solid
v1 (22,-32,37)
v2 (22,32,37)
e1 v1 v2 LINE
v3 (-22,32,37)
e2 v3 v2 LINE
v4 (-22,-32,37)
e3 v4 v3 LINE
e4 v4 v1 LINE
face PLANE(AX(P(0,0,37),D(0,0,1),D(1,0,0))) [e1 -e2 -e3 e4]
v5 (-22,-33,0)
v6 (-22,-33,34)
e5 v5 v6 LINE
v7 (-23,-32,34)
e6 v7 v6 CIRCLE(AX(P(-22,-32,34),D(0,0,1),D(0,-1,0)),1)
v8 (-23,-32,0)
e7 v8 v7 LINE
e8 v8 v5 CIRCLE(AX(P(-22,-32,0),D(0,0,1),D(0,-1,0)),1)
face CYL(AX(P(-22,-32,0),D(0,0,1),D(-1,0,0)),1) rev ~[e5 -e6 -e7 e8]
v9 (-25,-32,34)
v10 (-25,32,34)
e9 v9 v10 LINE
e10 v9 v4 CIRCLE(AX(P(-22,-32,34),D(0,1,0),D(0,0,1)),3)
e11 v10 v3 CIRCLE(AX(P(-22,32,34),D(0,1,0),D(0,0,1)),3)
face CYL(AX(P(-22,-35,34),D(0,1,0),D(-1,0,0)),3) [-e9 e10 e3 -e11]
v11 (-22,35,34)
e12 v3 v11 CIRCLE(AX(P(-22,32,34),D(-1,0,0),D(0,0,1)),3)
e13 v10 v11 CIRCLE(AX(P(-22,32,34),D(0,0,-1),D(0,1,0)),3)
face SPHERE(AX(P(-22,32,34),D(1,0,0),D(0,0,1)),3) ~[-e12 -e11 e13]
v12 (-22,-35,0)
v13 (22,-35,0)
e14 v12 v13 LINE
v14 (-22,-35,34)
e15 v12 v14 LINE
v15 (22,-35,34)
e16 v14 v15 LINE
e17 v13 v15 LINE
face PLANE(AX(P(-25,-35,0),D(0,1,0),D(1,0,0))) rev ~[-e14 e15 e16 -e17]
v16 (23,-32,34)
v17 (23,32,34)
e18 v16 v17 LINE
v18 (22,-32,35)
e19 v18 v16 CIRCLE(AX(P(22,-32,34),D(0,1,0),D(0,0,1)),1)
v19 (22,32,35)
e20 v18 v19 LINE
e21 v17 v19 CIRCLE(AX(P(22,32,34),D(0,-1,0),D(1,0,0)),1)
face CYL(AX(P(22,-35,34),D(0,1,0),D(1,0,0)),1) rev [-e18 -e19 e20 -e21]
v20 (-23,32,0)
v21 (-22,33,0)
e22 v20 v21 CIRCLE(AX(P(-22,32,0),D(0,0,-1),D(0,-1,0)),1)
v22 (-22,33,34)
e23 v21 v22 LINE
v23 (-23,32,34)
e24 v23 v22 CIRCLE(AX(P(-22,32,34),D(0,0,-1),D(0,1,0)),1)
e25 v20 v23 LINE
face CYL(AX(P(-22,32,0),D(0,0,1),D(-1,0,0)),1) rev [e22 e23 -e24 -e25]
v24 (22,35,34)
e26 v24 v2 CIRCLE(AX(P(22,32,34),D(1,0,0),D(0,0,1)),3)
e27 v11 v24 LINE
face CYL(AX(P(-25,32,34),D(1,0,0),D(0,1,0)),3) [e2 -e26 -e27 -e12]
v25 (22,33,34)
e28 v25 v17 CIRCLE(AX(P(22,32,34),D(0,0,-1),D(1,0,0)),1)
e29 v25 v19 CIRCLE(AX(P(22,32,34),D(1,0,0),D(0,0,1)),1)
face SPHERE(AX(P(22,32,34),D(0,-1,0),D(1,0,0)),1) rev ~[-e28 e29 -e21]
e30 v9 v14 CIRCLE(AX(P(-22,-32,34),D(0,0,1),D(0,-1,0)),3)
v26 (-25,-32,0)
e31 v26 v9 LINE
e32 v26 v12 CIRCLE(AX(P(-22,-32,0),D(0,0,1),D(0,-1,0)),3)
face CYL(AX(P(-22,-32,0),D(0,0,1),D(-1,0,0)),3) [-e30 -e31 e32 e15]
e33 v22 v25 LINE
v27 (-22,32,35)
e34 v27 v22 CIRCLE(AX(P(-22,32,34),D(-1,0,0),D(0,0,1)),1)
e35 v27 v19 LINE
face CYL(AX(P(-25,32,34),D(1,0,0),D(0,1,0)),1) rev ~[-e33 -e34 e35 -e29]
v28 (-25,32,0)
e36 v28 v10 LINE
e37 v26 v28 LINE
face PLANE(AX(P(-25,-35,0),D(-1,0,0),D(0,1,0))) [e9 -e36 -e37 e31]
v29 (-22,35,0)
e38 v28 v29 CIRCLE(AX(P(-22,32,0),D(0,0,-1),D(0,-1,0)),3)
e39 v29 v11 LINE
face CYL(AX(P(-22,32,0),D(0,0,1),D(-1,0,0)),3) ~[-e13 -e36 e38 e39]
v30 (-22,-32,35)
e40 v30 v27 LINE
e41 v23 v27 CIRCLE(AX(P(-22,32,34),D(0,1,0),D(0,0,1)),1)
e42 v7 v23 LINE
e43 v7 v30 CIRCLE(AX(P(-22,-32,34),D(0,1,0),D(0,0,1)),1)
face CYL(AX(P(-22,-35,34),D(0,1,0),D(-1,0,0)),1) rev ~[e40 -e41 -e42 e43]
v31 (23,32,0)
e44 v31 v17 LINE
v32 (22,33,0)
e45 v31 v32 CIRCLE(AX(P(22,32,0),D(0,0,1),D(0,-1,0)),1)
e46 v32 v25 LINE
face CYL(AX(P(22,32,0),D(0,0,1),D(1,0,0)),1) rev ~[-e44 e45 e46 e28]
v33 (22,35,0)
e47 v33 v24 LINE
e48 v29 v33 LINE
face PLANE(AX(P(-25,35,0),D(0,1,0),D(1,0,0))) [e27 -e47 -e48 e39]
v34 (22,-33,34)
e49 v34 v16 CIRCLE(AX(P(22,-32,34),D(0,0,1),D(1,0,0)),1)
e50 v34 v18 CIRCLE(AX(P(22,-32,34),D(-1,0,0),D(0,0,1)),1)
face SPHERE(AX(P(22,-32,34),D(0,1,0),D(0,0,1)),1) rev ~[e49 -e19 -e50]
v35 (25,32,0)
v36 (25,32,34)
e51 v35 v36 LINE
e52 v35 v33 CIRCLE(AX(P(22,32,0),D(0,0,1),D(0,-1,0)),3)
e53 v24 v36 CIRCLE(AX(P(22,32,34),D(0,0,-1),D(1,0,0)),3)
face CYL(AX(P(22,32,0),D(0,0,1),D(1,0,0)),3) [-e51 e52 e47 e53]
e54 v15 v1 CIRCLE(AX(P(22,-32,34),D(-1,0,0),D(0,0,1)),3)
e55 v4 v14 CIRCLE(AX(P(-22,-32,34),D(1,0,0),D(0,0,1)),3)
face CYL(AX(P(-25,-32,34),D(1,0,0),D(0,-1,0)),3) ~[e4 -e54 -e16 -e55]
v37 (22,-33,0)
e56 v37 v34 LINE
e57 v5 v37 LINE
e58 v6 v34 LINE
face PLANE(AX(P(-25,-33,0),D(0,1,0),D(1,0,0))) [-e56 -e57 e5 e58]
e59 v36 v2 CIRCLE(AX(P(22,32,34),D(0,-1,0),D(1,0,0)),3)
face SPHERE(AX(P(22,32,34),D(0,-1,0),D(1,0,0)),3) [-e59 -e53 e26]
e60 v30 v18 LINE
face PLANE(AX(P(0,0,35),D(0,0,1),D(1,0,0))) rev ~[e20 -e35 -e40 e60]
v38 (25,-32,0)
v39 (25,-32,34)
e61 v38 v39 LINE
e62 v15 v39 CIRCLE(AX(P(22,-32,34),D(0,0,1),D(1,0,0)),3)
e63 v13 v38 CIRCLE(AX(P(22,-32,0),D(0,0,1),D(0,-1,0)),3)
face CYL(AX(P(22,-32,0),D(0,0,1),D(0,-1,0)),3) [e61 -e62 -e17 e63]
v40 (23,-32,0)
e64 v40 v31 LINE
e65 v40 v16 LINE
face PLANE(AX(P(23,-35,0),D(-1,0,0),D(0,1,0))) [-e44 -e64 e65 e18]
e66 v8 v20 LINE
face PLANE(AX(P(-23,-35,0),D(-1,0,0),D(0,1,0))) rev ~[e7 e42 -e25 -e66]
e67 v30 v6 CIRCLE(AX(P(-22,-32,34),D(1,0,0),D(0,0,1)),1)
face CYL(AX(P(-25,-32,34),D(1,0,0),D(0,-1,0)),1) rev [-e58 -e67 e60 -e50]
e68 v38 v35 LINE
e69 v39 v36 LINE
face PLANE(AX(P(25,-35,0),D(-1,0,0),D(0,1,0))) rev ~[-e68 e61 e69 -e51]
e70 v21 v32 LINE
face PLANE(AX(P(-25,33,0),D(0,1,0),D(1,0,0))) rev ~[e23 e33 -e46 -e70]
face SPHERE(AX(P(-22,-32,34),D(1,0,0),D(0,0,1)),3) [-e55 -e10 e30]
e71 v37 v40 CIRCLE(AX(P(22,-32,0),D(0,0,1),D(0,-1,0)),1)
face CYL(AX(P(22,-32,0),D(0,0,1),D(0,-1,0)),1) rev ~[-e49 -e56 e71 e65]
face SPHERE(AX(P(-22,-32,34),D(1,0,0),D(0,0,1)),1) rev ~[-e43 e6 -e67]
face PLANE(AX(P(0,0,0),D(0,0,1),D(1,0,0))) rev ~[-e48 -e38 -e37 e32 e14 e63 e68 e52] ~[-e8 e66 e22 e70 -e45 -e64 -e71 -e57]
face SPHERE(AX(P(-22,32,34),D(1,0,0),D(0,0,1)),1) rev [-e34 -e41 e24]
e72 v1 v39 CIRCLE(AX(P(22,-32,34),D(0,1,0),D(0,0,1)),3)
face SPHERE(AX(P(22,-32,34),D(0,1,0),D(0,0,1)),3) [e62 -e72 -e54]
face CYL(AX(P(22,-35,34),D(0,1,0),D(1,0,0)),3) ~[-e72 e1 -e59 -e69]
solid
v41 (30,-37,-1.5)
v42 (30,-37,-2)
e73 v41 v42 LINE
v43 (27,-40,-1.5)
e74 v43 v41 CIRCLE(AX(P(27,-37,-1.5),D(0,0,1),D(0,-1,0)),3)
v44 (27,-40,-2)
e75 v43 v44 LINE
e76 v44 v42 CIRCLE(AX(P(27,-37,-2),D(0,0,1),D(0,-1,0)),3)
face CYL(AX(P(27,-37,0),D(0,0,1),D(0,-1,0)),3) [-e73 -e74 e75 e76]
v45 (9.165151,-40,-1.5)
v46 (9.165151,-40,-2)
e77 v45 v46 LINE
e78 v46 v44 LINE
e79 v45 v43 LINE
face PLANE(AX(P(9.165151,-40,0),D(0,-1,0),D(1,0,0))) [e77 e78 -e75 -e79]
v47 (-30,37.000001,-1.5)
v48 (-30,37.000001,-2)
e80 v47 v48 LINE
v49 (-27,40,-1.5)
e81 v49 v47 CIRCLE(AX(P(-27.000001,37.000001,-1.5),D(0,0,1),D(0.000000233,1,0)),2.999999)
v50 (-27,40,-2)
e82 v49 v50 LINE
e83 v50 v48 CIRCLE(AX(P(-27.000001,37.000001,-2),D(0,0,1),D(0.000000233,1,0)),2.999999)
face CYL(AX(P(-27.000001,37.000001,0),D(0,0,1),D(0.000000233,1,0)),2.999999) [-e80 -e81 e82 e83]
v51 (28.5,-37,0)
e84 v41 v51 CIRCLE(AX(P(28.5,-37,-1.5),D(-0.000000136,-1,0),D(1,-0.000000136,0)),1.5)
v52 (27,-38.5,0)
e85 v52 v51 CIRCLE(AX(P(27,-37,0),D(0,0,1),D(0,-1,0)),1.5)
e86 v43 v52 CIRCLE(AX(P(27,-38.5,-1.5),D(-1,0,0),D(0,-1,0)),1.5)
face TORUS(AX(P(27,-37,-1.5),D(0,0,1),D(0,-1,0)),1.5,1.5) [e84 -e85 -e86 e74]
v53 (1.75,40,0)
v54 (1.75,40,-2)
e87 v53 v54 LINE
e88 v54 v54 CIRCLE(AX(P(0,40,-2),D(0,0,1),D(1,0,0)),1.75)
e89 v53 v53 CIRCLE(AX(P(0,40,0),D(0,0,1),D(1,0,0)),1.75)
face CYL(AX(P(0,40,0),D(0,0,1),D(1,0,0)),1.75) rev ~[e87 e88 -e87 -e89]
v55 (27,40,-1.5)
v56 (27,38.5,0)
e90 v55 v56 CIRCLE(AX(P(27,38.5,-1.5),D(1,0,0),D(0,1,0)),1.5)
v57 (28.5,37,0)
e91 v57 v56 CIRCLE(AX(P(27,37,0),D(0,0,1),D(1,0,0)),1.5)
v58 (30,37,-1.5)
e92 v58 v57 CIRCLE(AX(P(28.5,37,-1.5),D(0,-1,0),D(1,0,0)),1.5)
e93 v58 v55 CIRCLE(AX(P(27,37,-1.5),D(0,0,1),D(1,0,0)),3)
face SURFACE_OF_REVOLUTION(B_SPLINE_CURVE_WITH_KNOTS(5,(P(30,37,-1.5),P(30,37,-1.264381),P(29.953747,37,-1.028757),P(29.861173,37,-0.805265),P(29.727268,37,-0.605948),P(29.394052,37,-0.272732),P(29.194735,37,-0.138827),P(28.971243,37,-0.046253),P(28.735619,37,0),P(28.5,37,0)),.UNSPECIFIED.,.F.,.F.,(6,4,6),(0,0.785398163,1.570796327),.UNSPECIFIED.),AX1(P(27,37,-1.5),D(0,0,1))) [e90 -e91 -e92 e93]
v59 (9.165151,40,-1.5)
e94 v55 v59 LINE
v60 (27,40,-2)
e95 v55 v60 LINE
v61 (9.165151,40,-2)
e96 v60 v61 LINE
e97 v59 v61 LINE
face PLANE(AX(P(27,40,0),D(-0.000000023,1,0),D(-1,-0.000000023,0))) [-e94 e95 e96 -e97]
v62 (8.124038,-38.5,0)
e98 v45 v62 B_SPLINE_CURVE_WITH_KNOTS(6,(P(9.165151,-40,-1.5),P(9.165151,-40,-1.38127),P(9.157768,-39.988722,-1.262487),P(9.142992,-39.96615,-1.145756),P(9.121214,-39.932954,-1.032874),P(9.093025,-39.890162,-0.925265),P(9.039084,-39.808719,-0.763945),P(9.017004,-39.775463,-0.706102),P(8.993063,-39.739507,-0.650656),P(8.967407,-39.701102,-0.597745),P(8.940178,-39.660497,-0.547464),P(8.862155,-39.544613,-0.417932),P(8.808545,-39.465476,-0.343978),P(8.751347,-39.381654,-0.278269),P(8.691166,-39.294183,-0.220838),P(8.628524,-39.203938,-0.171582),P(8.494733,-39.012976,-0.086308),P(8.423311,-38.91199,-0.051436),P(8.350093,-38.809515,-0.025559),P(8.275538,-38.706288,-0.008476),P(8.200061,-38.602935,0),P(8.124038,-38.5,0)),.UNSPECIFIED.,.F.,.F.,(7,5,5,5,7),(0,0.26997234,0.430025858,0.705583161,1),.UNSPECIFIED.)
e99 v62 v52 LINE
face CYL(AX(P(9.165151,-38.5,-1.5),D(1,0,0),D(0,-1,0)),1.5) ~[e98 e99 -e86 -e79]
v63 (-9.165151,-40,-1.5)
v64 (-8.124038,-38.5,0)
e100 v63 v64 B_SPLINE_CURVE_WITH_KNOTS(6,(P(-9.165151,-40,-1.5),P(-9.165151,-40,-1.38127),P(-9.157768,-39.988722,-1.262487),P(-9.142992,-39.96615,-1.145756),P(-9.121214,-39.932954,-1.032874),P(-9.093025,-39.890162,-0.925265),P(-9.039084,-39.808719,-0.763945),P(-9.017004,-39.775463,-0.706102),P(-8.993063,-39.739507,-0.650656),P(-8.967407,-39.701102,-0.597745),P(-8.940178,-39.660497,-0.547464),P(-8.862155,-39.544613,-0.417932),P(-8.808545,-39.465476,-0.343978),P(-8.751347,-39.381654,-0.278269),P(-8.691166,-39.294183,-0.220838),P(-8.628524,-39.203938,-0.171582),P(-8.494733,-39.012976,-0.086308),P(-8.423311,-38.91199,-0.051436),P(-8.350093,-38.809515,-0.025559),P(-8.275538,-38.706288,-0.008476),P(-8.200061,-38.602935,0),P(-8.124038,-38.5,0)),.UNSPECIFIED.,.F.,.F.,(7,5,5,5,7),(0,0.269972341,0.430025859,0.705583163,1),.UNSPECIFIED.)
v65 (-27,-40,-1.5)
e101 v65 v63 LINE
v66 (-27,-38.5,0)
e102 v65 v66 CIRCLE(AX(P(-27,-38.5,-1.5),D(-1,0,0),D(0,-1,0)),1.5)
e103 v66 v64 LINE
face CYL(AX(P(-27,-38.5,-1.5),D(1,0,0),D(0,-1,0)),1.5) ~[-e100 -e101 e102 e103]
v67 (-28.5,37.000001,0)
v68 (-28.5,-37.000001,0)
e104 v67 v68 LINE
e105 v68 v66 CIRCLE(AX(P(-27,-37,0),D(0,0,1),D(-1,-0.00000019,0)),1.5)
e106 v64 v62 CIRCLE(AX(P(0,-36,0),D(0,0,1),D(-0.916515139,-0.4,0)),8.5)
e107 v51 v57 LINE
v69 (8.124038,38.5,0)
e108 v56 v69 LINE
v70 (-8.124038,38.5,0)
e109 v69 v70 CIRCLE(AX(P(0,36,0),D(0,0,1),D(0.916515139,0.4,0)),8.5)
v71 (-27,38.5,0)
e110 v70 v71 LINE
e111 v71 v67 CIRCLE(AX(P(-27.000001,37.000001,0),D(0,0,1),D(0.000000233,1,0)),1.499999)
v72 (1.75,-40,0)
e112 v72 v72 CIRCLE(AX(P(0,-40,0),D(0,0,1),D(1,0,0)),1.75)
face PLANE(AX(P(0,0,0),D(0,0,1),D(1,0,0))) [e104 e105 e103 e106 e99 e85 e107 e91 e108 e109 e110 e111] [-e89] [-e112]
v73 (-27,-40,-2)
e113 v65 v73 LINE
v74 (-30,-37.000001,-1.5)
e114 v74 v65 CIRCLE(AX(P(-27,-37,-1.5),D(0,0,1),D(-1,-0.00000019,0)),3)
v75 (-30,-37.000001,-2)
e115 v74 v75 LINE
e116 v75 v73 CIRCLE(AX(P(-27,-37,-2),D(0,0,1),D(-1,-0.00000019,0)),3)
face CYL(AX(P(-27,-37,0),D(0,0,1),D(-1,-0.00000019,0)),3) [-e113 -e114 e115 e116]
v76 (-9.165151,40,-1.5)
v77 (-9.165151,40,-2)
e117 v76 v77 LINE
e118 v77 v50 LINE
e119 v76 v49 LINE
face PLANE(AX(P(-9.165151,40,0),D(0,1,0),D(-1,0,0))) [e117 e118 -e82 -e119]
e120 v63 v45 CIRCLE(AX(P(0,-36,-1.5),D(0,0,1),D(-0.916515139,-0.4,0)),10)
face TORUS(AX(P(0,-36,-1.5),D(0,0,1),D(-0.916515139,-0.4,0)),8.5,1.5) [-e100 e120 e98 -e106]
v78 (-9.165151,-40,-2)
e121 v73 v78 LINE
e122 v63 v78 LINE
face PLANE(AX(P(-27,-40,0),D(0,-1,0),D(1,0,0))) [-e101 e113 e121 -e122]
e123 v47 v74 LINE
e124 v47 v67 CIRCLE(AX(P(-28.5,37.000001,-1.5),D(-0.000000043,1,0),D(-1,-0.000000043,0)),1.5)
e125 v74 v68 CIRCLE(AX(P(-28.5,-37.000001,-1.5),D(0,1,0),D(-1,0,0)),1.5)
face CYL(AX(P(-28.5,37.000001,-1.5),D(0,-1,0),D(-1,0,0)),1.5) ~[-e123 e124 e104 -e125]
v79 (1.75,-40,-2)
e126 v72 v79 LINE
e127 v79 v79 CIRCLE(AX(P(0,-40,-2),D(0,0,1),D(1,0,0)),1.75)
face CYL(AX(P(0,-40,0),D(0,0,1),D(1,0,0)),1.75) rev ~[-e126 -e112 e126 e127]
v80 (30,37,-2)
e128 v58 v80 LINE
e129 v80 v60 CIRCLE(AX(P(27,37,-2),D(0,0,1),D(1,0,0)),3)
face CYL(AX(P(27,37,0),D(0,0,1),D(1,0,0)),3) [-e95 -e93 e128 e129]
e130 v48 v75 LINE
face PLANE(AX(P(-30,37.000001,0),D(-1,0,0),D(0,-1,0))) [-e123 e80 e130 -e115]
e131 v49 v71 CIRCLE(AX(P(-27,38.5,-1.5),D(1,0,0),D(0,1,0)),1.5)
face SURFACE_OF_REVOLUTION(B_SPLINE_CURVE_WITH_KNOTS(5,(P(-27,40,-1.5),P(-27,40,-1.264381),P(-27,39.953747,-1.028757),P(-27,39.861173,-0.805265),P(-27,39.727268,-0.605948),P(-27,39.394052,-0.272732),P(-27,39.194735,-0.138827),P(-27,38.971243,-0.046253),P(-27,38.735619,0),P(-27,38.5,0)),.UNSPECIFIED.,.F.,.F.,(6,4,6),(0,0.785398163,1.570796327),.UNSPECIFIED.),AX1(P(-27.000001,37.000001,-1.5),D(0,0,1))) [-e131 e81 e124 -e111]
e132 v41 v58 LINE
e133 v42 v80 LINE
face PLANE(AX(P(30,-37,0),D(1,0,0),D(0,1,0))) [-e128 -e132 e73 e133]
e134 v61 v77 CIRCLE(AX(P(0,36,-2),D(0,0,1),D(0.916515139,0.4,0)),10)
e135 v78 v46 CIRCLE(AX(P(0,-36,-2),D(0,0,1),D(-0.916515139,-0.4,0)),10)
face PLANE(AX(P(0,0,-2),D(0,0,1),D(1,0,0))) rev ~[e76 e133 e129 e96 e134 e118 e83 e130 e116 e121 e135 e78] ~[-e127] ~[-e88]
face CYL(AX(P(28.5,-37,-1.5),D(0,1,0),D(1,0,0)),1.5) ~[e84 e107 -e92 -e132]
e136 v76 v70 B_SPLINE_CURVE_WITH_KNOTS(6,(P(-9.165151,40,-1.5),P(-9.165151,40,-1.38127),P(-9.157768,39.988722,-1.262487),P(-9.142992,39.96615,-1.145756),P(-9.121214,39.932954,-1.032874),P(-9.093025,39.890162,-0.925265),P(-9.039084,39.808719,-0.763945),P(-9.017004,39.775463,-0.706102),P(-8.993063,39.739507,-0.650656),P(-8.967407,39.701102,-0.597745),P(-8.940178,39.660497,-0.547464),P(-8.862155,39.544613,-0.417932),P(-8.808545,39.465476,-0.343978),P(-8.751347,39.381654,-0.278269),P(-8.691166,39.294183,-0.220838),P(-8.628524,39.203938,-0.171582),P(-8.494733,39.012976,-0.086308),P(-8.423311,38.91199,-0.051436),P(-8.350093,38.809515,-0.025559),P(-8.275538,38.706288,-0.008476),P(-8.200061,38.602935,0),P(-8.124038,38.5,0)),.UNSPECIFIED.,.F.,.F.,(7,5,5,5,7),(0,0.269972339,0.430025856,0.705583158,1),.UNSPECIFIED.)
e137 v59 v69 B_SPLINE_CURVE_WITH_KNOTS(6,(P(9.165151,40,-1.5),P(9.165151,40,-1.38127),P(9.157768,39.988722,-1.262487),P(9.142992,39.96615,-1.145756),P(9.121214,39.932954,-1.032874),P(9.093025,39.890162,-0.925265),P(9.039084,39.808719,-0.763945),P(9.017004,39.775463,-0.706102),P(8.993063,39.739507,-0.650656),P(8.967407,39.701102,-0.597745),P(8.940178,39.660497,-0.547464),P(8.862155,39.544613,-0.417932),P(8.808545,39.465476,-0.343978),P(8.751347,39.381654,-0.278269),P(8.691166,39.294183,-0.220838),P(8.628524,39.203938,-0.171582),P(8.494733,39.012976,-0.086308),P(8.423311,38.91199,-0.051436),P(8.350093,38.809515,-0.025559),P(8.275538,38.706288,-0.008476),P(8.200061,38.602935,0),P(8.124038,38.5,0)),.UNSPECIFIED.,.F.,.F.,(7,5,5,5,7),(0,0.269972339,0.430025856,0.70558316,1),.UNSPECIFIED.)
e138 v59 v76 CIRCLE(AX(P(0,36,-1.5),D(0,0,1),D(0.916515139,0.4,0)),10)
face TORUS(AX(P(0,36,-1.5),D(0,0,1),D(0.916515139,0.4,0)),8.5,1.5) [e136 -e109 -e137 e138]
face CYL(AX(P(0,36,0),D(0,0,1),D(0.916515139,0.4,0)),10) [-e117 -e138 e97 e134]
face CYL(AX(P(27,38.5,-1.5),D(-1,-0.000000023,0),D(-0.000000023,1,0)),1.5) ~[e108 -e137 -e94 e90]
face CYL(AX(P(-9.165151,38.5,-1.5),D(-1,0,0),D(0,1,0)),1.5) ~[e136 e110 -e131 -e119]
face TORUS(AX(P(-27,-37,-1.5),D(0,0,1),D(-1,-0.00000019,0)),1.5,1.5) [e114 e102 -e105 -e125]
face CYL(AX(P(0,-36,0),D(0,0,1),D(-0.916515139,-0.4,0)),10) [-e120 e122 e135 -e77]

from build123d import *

# Parameters (mm, degrees)
F0_W     = 50
F0_H     = 70
F1_DEPTH = 37
F2_R     = 3
F3_T     = -2
F4_R     = 1.75
F5_DEPTH = 2
F6_R     = 1.5


# Not quite as in the source:
# - ends of sketch curves that miss each other by under 0.0002 mm in the source are joined
# - a feature names something its author has since deleted; it is built from what else it names


with BuildPart() as f1:
    # F0 (on Top) → F1 (new body)
    with BuildSketch(Plane.XY):
        Rectangle(F0_W, F0_H)
    extrude(amount=F1_DEPTH)

    # F2
    f2_edges = [f1.edges().sort_by_distance(p)[0] for p in [
        (25, 0, 37),
        (0, -35, 37),
        (25, -35, 18.5),
        (25, 35, 18.5),
        (0, 35, 37),
        (-25, 0, 37),
        (-25, -35, 18.5),
        (-25, 35, 18.5),
    ]]
    fillet(f2_edges, radius=F2_R)

    # F3
    f3_openings = [f1.faces().sort_by_distance(p)[0] for p in [
        (0, 0, 0),
    ]]
    offset(amount=F3_T, openings=f3_openings)


with BuildPart() as f5:
    # F4 (on Top) → F5 (new body)
    with BuildSketch(Plane.XY):
        with BuildLine():
            Line((9.1651513899, -40), (27, -40))
            ThreePointArc((27, -40), (29.1213201989, -39.1213204882), (30, -37.000000409))
            Line((30, -37.000000409), (30, 37.000000409))
            ThreePointArc((30, 37.000000409), (29.1213203436, 39.1213207526), (27, 40.000000409))
            Line((27, 40.000000409), (9.1651513899, 40))
            ThreePointArc((9.1651513899, 40), (0, 46), (-9.1651513899, 40))
            Line((-9.1651513899, 40), (-27, 40))
            ThreePointArc((-27, 40), (-29.1213202871, 39.121320809), (-30, 37.0000005686))
            Line((-30, 37.0000005686), (-30, -37.0000005686))
            ThreePointArc((-30, -37.0000005686), (-29.1213201425, -39.1213205446), (-27, -40))
            Line((-27, -40), (-9.1651513899, -40))
            ThreePointArc((-9.1651513899, -40), (0, -46), (9.1651513899, -40))
        make_face()
        with Locations((0, -40)):
            Circle(F4_R, mode=Mode.SUBTRACT)
        with Locations((0, 40)):
            Circle(F4_R, mode=Mode.SUBTRACT)
    extrude(amount=-F5_DEPTH)

    # F6
    f6_edges = [f5.edges().sort_by_distance(p)[0] for p in [
        (-30, 0, 0),
        (0, 46, 0),
        (18.082576, 40, 0),
        (29.12132, 39.121321, 0),
        (0, -46, 0),
    ]]
    fillet(f6_edges, radius=F6_R)


solid = Compound([f1.part, f5.part])
